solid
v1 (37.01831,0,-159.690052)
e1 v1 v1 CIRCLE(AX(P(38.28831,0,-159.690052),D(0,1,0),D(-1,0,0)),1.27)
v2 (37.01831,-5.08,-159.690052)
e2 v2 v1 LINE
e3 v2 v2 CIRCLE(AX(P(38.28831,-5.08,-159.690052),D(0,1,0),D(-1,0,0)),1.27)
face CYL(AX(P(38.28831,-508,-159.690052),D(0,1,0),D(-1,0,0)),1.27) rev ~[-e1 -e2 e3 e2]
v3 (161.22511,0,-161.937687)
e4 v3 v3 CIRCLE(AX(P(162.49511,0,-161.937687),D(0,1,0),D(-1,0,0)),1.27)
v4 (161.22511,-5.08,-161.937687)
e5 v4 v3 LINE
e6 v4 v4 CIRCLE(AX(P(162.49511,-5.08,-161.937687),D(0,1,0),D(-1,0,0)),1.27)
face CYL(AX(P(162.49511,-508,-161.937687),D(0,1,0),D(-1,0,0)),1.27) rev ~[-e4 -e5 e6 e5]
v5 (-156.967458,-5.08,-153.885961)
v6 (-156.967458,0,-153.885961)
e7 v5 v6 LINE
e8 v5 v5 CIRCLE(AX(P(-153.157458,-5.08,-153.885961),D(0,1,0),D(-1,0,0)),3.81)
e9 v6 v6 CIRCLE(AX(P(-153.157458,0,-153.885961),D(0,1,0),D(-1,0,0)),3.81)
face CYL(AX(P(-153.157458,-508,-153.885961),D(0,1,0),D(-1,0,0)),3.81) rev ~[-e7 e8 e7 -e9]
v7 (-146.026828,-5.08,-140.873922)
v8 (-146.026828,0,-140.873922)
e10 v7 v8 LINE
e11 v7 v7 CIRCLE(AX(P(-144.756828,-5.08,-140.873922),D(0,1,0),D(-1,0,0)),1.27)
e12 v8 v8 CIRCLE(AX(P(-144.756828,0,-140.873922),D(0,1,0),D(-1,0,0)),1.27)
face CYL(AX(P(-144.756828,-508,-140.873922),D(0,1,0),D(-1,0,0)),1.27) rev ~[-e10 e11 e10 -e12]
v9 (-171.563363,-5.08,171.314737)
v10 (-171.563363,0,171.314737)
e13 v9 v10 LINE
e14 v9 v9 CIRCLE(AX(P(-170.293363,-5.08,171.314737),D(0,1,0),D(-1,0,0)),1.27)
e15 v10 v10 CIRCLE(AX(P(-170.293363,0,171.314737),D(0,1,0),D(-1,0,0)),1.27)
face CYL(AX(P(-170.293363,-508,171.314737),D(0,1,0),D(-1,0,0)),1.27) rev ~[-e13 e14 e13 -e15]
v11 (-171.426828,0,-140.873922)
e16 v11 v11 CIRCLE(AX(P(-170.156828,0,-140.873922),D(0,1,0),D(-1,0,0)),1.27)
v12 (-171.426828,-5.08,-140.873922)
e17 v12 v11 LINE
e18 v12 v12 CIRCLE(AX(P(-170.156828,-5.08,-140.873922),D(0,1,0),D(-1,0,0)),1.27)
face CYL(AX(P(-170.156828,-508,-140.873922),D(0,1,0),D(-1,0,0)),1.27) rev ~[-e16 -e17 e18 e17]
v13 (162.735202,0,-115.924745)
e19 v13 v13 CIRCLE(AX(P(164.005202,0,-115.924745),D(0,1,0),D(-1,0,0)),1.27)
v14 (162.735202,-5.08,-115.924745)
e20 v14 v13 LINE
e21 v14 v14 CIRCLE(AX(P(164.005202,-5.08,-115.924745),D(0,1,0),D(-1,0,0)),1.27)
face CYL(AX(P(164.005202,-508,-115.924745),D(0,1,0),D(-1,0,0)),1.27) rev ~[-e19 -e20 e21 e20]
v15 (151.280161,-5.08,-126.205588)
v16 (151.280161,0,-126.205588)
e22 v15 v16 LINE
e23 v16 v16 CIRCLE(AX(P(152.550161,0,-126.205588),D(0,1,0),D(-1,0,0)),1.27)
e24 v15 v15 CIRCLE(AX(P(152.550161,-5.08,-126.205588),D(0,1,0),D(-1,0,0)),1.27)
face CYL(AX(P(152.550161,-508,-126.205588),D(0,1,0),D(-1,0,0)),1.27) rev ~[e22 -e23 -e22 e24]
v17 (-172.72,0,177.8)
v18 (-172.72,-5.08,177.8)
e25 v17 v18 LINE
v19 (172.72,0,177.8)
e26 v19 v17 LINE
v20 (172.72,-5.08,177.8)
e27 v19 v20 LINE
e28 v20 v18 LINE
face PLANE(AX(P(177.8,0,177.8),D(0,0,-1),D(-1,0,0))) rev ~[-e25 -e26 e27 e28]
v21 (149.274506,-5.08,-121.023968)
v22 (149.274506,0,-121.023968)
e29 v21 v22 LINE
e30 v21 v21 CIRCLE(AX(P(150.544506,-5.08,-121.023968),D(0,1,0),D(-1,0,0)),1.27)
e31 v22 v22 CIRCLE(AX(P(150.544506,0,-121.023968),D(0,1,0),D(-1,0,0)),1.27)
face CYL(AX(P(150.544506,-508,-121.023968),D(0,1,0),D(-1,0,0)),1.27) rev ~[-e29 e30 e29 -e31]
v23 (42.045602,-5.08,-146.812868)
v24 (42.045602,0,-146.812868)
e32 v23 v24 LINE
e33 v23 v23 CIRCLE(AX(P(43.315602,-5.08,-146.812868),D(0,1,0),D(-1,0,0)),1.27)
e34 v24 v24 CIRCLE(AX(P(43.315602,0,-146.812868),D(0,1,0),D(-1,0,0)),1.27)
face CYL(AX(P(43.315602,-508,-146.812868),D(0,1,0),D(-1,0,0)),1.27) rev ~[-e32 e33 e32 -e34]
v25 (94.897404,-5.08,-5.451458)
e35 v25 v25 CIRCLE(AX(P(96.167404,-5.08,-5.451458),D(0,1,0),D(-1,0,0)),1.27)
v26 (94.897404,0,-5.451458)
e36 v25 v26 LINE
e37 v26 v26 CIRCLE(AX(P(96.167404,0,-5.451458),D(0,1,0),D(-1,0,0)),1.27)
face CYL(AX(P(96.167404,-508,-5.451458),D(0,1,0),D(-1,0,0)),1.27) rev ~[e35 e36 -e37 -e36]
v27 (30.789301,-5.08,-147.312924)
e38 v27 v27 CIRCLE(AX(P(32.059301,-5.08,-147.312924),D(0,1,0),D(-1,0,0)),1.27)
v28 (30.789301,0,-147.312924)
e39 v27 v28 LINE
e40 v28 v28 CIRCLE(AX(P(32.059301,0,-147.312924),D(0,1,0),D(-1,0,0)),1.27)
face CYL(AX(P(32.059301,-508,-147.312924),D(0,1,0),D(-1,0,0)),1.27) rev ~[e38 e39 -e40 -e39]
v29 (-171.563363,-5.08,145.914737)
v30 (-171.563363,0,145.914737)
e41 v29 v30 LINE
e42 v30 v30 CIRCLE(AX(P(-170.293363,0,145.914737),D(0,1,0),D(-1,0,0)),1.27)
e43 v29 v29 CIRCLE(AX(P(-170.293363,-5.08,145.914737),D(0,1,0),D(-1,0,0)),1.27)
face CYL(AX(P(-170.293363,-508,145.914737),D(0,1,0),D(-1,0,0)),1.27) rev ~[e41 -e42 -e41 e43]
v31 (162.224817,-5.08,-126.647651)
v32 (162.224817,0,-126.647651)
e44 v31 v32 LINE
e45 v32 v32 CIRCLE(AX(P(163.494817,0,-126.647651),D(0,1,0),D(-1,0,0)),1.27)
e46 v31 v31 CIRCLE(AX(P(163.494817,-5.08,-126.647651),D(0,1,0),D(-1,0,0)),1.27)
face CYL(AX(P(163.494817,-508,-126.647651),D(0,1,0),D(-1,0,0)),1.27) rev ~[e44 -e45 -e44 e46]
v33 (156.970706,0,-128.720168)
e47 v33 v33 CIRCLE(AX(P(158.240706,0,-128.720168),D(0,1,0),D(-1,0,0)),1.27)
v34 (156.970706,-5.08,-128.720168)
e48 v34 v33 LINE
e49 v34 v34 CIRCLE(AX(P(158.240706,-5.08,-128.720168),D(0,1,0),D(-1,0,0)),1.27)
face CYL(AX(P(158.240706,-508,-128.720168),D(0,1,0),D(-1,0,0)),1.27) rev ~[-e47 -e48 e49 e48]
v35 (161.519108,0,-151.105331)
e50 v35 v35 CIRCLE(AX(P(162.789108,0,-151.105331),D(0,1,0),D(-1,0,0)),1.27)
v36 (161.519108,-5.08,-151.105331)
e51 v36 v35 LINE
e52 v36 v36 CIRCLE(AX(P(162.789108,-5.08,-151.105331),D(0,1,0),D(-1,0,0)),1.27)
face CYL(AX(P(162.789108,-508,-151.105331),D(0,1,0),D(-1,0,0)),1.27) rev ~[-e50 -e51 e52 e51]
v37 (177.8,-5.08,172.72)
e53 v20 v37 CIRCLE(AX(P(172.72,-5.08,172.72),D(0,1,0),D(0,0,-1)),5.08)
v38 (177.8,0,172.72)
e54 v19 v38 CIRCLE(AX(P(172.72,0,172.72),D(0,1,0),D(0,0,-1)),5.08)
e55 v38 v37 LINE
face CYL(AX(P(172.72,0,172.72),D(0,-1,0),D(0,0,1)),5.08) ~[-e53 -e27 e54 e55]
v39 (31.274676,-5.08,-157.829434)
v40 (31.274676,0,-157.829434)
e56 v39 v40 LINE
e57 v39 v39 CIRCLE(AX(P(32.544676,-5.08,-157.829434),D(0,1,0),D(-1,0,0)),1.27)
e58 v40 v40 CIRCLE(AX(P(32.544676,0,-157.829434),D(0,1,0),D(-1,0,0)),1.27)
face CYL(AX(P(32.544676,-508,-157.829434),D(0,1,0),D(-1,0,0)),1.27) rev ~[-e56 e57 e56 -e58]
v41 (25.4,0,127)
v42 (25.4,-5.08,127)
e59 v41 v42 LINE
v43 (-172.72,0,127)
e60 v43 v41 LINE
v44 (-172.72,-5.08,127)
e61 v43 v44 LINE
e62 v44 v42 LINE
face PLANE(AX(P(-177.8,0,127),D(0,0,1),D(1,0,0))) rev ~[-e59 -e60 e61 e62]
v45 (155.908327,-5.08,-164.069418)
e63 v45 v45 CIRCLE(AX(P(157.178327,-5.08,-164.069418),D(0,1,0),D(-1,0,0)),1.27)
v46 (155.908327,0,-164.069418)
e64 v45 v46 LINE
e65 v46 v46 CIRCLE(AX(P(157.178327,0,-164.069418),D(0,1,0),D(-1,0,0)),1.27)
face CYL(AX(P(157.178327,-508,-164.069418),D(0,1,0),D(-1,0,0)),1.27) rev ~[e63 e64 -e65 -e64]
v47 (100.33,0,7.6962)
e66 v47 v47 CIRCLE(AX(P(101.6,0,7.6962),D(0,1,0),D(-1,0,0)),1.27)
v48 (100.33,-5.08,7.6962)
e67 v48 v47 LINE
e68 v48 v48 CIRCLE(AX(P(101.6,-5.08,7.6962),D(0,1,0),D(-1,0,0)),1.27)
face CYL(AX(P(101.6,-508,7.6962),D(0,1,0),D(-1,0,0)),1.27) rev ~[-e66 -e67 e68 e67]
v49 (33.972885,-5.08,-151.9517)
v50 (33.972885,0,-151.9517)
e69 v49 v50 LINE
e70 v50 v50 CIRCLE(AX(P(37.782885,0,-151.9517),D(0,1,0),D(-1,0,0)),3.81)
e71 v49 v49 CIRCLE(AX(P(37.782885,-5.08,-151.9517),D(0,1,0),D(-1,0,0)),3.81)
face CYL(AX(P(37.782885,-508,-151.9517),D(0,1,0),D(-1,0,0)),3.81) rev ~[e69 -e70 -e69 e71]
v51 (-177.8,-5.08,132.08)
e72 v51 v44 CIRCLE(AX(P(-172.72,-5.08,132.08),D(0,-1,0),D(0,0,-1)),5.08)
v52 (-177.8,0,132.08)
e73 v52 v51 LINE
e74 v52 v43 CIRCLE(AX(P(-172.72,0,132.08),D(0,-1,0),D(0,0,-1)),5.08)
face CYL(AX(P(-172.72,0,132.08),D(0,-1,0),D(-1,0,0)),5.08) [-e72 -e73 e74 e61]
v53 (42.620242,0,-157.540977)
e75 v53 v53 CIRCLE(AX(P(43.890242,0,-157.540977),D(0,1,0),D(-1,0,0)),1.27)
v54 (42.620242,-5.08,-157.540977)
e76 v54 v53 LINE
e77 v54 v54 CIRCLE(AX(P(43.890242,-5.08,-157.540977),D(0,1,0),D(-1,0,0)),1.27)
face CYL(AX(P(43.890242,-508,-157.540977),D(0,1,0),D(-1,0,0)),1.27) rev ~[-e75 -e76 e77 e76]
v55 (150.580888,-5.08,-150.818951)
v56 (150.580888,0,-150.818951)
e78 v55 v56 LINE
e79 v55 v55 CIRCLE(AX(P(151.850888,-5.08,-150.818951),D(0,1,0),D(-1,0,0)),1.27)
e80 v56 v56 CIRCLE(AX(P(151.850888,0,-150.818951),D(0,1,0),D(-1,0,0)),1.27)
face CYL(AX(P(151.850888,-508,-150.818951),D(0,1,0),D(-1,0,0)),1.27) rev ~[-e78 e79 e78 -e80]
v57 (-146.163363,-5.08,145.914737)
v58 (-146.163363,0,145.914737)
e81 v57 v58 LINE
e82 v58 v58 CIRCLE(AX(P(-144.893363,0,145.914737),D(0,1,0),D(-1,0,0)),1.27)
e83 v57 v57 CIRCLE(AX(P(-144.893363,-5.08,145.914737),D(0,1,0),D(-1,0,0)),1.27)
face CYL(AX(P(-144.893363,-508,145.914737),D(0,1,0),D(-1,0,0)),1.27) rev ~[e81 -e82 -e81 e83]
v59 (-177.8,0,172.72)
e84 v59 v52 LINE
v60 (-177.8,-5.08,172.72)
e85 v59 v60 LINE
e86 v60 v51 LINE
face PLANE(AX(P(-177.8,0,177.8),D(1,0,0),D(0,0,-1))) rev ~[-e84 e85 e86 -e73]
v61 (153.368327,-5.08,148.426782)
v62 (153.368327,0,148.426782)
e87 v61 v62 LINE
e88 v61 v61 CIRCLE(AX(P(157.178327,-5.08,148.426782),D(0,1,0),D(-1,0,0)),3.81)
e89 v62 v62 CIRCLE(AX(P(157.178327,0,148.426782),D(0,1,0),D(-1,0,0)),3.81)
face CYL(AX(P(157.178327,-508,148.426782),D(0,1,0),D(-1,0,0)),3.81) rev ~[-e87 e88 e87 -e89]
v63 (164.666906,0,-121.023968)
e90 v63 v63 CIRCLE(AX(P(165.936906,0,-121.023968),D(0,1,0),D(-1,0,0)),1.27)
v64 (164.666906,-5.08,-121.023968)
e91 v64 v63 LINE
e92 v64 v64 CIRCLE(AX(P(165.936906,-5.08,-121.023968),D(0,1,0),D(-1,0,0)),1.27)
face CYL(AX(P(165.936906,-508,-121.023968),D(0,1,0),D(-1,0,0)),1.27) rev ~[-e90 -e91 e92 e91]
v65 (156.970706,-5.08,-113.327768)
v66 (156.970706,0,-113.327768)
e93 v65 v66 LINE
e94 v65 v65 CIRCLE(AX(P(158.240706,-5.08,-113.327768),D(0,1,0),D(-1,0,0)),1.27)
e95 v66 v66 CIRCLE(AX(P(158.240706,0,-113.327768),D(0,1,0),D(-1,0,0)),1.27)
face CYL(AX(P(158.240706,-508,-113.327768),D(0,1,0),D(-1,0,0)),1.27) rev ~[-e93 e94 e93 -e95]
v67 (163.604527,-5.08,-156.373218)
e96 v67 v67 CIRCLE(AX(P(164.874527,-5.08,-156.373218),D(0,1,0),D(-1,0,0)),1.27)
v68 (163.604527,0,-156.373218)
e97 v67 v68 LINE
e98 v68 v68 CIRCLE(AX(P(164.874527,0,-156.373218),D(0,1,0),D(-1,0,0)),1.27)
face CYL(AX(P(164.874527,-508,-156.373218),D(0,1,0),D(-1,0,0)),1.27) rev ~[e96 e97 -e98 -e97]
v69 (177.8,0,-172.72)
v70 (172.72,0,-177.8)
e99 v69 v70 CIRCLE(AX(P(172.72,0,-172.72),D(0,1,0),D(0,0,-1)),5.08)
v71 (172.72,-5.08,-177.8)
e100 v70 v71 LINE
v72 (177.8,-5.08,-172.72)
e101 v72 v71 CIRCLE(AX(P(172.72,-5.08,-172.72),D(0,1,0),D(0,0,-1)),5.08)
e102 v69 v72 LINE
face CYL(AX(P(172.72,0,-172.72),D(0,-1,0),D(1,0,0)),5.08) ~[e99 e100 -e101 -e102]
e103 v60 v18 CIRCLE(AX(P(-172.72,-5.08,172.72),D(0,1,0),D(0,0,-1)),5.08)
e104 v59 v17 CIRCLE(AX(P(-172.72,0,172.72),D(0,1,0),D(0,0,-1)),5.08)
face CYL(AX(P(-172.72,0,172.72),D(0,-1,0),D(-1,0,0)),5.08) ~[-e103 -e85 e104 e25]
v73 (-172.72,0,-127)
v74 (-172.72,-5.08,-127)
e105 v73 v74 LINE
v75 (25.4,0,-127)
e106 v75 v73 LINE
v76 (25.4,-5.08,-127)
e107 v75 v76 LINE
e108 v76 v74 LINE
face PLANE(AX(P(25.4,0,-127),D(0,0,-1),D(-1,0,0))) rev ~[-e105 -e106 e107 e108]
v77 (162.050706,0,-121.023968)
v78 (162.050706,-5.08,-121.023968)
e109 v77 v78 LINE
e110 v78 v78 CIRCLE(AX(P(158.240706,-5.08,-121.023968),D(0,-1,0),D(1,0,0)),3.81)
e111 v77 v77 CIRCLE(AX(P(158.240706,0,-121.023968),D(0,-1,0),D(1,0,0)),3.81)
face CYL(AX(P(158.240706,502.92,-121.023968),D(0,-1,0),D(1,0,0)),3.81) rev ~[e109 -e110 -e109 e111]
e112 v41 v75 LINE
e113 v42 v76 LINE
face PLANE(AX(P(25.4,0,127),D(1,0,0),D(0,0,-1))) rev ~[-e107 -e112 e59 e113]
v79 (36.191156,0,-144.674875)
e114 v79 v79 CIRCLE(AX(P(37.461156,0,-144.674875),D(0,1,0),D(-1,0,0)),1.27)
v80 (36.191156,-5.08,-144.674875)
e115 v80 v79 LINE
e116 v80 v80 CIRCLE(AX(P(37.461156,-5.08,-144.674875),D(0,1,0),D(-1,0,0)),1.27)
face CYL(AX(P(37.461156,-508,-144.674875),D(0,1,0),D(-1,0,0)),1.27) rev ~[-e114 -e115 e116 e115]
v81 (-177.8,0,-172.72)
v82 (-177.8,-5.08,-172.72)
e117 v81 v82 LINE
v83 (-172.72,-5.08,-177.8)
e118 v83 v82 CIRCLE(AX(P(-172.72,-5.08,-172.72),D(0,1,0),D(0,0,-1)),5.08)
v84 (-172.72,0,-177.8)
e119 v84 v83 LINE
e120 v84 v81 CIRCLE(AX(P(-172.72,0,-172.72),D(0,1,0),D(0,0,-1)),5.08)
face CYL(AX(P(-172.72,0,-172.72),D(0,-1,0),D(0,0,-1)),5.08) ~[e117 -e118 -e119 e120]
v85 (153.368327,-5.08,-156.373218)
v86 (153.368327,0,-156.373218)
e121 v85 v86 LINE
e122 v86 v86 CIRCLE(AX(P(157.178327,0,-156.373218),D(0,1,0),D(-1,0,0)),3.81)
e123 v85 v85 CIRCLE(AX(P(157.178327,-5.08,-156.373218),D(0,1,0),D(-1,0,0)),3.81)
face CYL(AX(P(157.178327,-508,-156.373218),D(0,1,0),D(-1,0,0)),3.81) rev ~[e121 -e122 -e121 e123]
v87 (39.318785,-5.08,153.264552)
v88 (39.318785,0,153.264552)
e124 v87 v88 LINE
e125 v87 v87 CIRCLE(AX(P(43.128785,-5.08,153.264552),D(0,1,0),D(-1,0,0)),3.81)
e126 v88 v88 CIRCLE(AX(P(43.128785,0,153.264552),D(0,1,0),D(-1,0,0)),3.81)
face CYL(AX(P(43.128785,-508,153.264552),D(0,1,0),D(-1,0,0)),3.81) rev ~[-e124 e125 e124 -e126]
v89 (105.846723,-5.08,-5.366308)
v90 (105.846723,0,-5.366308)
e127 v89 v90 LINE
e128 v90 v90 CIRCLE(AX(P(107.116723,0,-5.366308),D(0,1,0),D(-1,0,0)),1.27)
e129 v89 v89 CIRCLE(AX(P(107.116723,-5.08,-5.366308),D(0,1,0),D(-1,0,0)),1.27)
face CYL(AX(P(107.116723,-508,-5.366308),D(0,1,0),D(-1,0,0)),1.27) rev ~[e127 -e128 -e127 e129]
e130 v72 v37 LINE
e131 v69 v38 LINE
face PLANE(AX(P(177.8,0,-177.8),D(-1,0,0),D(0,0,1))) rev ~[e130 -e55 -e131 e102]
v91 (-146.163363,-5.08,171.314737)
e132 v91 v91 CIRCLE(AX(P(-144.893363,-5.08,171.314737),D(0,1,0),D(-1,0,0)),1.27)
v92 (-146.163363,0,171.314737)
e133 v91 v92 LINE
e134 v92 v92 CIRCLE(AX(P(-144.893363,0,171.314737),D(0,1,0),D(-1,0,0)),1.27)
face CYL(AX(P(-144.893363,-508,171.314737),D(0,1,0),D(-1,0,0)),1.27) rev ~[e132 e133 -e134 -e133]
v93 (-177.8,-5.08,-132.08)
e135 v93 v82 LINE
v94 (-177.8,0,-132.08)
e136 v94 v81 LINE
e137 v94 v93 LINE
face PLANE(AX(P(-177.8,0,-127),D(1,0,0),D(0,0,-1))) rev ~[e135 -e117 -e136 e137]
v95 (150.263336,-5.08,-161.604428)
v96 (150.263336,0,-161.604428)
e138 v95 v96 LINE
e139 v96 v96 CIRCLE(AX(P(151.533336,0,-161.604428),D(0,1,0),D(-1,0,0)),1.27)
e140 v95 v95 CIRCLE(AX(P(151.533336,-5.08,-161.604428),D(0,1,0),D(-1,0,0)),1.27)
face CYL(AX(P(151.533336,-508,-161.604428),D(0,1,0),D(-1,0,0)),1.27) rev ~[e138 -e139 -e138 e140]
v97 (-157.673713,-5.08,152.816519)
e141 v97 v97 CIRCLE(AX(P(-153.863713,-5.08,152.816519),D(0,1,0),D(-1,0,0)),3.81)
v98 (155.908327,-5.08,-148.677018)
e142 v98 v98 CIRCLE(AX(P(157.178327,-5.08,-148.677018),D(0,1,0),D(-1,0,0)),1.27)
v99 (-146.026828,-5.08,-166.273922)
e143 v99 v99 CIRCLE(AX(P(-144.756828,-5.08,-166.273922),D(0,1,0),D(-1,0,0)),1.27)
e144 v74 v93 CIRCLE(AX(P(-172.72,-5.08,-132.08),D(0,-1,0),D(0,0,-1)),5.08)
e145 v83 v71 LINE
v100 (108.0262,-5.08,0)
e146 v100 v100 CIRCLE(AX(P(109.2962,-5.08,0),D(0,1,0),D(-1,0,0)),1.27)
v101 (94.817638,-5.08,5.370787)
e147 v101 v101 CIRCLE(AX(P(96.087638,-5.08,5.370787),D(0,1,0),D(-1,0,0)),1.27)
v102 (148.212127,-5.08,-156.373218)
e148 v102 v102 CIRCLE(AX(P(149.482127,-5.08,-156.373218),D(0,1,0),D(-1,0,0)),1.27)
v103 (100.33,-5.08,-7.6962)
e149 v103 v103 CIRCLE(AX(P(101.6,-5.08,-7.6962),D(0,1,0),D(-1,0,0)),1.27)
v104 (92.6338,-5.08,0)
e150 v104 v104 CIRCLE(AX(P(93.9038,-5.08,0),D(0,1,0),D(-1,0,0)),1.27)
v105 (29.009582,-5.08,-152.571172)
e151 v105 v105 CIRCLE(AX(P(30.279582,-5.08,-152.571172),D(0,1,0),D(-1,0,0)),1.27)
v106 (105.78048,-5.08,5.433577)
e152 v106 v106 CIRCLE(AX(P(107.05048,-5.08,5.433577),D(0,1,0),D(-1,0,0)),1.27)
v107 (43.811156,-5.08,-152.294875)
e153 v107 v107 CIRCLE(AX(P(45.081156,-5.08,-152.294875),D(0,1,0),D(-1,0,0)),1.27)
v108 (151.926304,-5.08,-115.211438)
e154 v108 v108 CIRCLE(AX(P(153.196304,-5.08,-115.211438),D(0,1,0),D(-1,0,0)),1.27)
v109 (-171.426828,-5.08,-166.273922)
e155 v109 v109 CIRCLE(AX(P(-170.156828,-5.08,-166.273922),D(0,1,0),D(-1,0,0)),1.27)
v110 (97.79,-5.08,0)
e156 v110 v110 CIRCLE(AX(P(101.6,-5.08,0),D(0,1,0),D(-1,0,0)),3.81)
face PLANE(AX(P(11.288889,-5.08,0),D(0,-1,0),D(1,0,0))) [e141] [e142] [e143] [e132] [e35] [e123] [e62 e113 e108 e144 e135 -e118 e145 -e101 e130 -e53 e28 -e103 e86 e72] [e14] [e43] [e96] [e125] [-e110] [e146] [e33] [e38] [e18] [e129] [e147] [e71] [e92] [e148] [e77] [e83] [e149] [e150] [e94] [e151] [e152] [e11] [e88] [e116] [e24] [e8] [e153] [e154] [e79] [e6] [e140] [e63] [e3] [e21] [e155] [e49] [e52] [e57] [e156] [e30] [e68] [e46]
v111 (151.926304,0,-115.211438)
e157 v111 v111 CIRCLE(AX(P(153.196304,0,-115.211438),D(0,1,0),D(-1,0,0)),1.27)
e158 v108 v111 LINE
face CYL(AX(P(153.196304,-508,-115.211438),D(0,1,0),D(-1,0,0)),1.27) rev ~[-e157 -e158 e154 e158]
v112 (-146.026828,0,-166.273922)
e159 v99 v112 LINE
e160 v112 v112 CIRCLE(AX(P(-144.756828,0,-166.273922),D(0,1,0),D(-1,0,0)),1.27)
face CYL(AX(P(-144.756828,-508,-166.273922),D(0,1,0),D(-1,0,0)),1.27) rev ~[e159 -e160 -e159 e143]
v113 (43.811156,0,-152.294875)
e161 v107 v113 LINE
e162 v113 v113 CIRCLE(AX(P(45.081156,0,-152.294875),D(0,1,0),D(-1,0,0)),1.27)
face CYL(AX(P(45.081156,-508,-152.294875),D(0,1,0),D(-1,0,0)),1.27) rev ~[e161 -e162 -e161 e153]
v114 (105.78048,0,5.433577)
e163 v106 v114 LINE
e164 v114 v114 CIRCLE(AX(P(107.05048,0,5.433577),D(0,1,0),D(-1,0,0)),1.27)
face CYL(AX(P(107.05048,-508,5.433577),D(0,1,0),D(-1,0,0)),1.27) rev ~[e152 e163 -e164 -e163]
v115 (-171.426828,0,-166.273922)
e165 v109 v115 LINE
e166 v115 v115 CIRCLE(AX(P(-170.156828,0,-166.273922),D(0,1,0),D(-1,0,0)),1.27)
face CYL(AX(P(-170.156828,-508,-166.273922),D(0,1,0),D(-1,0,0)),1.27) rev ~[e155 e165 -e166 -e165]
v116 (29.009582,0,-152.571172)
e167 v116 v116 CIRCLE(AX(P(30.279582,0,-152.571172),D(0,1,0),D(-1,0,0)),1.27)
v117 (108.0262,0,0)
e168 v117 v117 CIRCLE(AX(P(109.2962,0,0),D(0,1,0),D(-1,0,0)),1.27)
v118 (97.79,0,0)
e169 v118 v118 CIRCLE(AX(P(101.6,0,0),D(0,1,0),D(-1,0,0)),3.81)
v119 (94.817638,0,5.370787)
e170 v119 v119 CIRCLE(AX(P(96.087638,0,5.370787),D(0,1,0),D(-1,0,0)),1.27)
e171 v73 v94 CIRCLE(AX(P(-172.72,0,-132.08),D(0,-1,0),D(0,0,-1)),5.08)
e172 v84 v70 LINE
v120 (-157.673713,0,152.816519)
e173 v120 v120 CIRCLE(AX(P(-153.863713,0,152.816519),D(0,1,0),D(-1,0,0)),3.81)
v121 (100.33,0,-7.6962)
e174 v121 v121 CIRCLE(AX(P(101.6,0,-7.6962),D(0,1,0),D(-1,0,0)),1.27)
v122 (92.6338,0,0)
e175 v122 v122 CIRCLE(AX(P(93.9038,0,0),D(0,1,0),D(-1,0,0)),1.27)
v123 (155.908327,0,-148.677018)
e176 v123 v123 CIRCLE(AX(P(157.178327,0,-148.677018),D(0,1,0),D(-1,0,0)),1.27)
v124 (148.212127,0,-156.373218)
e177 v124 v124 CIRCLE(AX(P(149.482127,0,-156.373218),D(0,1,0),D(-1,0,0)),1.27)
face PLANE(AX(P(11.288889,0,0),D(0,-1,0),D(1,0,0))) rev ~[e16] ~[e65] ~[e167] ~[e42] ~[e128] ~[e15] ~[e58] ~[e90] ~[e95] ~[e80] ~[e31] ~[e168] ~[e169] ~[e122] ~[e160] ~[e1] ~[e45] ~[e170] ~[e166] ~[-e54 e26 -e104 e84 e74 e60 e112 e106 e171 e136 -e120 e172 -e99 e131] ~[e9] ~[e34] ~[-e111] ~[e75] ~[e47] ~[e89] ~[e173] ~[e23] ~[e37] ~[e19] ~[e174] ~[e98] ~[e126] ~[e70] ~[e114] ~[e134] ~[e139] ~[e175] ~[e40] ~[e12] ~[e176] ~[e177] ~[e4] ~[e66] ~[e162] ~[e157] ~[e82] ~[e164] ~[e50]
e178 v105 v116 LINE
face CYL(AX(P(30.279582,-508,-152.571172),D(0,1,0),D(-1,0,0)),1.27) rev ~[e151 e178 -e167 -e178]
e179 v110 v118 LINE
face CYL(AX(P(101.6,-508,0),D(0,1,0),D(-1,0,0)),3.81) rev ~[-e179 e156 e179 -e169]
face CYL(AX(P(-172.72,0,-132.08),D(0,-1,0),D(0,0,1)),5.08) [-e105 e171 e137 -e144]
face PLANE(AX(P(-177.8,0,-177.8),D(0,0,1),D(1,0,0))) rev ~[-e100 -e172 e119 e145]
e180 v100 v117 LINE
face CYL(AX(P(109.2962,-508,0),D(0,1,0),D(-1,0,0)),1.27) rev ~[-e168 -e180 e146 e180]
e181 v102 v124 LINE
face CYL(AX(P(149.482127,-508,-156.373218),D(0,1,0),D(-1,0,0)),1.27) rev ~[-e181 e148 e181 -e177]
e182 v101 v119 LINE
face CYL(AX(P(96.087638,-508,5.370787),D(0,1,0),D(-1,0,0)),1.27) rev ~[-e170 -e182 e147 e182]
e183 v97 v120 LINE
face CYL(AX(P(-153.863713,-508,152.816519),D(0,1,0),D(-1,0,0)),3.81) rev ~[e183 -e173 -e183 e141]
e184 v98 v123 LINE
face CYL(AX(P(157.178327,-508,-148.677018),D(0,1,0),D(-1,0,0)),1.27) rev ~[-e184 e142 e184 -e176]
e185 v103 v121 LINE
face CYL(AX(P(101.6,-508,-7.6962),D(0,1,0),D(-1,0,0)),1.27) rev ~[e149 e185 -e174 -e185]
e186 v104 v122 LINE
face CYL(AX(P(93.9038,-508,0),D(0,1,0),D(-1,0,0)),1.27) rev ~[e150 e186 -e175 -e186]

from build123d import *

# Parameters (mm, degrees)
F1_DEPTH = 5.08
F3_D     = 7.62
F4_R     = 5.08
F6_D     = 2.54
F8_D     = 7.62
F10_D    = 2.54
F12_D    = 2.54
F14_D    = 7.62
F16_D    = 7.62


# Not quite as in the source:
# - a feature names something its author has since deleted; it is built from what else it names


with BuildPart() as f1:
    # F0 (on Front) → F1 (new body)
    with BuildSketch(Plane.XZ):
        Polygon((27.4981856346, 177.8), (-177.8, 177.8), (-177.8, 127), (25.4, 127), (25.4, -127), (-177.8, -127), (-177.8, -177.8), (25.4, -177.8), (177.8, -177.8), (177.8, 177.8), align=None)
    extrude(amount=F1_DEPTH)

    # F3 (through all)
    with Locations(Plane.XZ.offset(5.08)):
        with Locations((-153.8637131453, 152.8165191412), (101.6, 0), (-153.1574577093, -153.8859605789), (157.1783274412, -156.3732177019), (157.1783274412, 148.4267822981)):
            Hole(F3_D / 2)

    # F4
    f4_edges = [f1.edges().sort_by_distance(p)[0] for p in [
        (177.8, -2.54, 177.8),
        (-177.8, -2.54, 177.8),
        (-177.8, -2.54, 127),
        (-177.8, -2.54, -127),
        (-177.8, -2.54, -177.8),
        (177.8, -2.54, -177.8),
    ]]
    fillet(f4_edges, radius=F4_R)

    # F6 (through all)
    with Locations(Plane.XZ.offset(5.08)):
        with Locations((93.9038, 0), (101.6, 7.6962), (109.2962, 0), (101.6, -7.6962), (-170.1568275641, -140.8739216598), (-144.7568275641, -140.8739216598), (-170.1568275641, -166.2739216598), (-144.7568275641, -166.2739216598), (157.1783274412, -148.6770177019), (151.850887514, -150.8189510301), (162.4951099118, -161.9376870028), (157.1783274412, -164.0694177019), (-170.2933631182, 171.3147368595), (-144.8933631182, 171.3147368595), (-144.8933631182, 145.9147368595), (-170.2933631182, 145.9147368595), (96.0876377272, 5.3707873365), (107.050479993, 5.433577301), (107.1167234014, -5.3663076089), (96.1674041077, -5.4514581821), (149.4821274412, -156.3732177019), (151.5333356816, -161.6044281234), (164.8745274412, -156.3732177019), (162.7891082701, -151.1053307507)):
            Hole(F6_D / 2)

    # F8 (through all)
    with Locations(Plane(origin=(0, 0, 0), x_dir=(-1, 0, 0), z_dir=(0, 1, 0))):
        with Locations((-158.2407057285, -121.0239678621)):
            Hole(F8_D / 2)

    # F10 (through all)
    with Locations(Plane.XZ.offset(5.08)):
        with Locations((165.9369057285, -121.0239678621), (164.0052020571, -115.9247447333), (163.4948166475, -126.6476510761), (158.2407057285, -128.7201678621), (152.5501607373, -126.2055884718), (150.5445057285, -121.0239678621), (153.1963041185, -115.2114377042), (158.2407057285, -113.3277678621)):
            Hole(F10_D / 2)

    # F12 (through all)
    with Locations(Plane.XZ.offset(5.08)):
        with Locations((32.0593006909, -147.3129242659), (37.4611556555, -144.6748753268), (43.3156022713, -146.8128675346), (45.0811556555, -152.2948753268), (43.8902415335, -157.5409770012), (38.2883101702, -159.6900522709), (32.5446762145, -157.8294336796), (30.2795823663, -152.5711715221)):
            Hole(F12_D / 2)

    # F14 (through all)
    with Locations(Plane.XZ.offset(5.08)):
        with Locations((37.7828851342, -151.951700449)):
            Hole(F14_D / 2)

    # F16 (through all)
    with Locations(Plane.XZ.offset(5.08)):
        with Locations((43.1287847459, 153.2645523548)):
            Hole(F16_D / 2)


solid = f1.part
